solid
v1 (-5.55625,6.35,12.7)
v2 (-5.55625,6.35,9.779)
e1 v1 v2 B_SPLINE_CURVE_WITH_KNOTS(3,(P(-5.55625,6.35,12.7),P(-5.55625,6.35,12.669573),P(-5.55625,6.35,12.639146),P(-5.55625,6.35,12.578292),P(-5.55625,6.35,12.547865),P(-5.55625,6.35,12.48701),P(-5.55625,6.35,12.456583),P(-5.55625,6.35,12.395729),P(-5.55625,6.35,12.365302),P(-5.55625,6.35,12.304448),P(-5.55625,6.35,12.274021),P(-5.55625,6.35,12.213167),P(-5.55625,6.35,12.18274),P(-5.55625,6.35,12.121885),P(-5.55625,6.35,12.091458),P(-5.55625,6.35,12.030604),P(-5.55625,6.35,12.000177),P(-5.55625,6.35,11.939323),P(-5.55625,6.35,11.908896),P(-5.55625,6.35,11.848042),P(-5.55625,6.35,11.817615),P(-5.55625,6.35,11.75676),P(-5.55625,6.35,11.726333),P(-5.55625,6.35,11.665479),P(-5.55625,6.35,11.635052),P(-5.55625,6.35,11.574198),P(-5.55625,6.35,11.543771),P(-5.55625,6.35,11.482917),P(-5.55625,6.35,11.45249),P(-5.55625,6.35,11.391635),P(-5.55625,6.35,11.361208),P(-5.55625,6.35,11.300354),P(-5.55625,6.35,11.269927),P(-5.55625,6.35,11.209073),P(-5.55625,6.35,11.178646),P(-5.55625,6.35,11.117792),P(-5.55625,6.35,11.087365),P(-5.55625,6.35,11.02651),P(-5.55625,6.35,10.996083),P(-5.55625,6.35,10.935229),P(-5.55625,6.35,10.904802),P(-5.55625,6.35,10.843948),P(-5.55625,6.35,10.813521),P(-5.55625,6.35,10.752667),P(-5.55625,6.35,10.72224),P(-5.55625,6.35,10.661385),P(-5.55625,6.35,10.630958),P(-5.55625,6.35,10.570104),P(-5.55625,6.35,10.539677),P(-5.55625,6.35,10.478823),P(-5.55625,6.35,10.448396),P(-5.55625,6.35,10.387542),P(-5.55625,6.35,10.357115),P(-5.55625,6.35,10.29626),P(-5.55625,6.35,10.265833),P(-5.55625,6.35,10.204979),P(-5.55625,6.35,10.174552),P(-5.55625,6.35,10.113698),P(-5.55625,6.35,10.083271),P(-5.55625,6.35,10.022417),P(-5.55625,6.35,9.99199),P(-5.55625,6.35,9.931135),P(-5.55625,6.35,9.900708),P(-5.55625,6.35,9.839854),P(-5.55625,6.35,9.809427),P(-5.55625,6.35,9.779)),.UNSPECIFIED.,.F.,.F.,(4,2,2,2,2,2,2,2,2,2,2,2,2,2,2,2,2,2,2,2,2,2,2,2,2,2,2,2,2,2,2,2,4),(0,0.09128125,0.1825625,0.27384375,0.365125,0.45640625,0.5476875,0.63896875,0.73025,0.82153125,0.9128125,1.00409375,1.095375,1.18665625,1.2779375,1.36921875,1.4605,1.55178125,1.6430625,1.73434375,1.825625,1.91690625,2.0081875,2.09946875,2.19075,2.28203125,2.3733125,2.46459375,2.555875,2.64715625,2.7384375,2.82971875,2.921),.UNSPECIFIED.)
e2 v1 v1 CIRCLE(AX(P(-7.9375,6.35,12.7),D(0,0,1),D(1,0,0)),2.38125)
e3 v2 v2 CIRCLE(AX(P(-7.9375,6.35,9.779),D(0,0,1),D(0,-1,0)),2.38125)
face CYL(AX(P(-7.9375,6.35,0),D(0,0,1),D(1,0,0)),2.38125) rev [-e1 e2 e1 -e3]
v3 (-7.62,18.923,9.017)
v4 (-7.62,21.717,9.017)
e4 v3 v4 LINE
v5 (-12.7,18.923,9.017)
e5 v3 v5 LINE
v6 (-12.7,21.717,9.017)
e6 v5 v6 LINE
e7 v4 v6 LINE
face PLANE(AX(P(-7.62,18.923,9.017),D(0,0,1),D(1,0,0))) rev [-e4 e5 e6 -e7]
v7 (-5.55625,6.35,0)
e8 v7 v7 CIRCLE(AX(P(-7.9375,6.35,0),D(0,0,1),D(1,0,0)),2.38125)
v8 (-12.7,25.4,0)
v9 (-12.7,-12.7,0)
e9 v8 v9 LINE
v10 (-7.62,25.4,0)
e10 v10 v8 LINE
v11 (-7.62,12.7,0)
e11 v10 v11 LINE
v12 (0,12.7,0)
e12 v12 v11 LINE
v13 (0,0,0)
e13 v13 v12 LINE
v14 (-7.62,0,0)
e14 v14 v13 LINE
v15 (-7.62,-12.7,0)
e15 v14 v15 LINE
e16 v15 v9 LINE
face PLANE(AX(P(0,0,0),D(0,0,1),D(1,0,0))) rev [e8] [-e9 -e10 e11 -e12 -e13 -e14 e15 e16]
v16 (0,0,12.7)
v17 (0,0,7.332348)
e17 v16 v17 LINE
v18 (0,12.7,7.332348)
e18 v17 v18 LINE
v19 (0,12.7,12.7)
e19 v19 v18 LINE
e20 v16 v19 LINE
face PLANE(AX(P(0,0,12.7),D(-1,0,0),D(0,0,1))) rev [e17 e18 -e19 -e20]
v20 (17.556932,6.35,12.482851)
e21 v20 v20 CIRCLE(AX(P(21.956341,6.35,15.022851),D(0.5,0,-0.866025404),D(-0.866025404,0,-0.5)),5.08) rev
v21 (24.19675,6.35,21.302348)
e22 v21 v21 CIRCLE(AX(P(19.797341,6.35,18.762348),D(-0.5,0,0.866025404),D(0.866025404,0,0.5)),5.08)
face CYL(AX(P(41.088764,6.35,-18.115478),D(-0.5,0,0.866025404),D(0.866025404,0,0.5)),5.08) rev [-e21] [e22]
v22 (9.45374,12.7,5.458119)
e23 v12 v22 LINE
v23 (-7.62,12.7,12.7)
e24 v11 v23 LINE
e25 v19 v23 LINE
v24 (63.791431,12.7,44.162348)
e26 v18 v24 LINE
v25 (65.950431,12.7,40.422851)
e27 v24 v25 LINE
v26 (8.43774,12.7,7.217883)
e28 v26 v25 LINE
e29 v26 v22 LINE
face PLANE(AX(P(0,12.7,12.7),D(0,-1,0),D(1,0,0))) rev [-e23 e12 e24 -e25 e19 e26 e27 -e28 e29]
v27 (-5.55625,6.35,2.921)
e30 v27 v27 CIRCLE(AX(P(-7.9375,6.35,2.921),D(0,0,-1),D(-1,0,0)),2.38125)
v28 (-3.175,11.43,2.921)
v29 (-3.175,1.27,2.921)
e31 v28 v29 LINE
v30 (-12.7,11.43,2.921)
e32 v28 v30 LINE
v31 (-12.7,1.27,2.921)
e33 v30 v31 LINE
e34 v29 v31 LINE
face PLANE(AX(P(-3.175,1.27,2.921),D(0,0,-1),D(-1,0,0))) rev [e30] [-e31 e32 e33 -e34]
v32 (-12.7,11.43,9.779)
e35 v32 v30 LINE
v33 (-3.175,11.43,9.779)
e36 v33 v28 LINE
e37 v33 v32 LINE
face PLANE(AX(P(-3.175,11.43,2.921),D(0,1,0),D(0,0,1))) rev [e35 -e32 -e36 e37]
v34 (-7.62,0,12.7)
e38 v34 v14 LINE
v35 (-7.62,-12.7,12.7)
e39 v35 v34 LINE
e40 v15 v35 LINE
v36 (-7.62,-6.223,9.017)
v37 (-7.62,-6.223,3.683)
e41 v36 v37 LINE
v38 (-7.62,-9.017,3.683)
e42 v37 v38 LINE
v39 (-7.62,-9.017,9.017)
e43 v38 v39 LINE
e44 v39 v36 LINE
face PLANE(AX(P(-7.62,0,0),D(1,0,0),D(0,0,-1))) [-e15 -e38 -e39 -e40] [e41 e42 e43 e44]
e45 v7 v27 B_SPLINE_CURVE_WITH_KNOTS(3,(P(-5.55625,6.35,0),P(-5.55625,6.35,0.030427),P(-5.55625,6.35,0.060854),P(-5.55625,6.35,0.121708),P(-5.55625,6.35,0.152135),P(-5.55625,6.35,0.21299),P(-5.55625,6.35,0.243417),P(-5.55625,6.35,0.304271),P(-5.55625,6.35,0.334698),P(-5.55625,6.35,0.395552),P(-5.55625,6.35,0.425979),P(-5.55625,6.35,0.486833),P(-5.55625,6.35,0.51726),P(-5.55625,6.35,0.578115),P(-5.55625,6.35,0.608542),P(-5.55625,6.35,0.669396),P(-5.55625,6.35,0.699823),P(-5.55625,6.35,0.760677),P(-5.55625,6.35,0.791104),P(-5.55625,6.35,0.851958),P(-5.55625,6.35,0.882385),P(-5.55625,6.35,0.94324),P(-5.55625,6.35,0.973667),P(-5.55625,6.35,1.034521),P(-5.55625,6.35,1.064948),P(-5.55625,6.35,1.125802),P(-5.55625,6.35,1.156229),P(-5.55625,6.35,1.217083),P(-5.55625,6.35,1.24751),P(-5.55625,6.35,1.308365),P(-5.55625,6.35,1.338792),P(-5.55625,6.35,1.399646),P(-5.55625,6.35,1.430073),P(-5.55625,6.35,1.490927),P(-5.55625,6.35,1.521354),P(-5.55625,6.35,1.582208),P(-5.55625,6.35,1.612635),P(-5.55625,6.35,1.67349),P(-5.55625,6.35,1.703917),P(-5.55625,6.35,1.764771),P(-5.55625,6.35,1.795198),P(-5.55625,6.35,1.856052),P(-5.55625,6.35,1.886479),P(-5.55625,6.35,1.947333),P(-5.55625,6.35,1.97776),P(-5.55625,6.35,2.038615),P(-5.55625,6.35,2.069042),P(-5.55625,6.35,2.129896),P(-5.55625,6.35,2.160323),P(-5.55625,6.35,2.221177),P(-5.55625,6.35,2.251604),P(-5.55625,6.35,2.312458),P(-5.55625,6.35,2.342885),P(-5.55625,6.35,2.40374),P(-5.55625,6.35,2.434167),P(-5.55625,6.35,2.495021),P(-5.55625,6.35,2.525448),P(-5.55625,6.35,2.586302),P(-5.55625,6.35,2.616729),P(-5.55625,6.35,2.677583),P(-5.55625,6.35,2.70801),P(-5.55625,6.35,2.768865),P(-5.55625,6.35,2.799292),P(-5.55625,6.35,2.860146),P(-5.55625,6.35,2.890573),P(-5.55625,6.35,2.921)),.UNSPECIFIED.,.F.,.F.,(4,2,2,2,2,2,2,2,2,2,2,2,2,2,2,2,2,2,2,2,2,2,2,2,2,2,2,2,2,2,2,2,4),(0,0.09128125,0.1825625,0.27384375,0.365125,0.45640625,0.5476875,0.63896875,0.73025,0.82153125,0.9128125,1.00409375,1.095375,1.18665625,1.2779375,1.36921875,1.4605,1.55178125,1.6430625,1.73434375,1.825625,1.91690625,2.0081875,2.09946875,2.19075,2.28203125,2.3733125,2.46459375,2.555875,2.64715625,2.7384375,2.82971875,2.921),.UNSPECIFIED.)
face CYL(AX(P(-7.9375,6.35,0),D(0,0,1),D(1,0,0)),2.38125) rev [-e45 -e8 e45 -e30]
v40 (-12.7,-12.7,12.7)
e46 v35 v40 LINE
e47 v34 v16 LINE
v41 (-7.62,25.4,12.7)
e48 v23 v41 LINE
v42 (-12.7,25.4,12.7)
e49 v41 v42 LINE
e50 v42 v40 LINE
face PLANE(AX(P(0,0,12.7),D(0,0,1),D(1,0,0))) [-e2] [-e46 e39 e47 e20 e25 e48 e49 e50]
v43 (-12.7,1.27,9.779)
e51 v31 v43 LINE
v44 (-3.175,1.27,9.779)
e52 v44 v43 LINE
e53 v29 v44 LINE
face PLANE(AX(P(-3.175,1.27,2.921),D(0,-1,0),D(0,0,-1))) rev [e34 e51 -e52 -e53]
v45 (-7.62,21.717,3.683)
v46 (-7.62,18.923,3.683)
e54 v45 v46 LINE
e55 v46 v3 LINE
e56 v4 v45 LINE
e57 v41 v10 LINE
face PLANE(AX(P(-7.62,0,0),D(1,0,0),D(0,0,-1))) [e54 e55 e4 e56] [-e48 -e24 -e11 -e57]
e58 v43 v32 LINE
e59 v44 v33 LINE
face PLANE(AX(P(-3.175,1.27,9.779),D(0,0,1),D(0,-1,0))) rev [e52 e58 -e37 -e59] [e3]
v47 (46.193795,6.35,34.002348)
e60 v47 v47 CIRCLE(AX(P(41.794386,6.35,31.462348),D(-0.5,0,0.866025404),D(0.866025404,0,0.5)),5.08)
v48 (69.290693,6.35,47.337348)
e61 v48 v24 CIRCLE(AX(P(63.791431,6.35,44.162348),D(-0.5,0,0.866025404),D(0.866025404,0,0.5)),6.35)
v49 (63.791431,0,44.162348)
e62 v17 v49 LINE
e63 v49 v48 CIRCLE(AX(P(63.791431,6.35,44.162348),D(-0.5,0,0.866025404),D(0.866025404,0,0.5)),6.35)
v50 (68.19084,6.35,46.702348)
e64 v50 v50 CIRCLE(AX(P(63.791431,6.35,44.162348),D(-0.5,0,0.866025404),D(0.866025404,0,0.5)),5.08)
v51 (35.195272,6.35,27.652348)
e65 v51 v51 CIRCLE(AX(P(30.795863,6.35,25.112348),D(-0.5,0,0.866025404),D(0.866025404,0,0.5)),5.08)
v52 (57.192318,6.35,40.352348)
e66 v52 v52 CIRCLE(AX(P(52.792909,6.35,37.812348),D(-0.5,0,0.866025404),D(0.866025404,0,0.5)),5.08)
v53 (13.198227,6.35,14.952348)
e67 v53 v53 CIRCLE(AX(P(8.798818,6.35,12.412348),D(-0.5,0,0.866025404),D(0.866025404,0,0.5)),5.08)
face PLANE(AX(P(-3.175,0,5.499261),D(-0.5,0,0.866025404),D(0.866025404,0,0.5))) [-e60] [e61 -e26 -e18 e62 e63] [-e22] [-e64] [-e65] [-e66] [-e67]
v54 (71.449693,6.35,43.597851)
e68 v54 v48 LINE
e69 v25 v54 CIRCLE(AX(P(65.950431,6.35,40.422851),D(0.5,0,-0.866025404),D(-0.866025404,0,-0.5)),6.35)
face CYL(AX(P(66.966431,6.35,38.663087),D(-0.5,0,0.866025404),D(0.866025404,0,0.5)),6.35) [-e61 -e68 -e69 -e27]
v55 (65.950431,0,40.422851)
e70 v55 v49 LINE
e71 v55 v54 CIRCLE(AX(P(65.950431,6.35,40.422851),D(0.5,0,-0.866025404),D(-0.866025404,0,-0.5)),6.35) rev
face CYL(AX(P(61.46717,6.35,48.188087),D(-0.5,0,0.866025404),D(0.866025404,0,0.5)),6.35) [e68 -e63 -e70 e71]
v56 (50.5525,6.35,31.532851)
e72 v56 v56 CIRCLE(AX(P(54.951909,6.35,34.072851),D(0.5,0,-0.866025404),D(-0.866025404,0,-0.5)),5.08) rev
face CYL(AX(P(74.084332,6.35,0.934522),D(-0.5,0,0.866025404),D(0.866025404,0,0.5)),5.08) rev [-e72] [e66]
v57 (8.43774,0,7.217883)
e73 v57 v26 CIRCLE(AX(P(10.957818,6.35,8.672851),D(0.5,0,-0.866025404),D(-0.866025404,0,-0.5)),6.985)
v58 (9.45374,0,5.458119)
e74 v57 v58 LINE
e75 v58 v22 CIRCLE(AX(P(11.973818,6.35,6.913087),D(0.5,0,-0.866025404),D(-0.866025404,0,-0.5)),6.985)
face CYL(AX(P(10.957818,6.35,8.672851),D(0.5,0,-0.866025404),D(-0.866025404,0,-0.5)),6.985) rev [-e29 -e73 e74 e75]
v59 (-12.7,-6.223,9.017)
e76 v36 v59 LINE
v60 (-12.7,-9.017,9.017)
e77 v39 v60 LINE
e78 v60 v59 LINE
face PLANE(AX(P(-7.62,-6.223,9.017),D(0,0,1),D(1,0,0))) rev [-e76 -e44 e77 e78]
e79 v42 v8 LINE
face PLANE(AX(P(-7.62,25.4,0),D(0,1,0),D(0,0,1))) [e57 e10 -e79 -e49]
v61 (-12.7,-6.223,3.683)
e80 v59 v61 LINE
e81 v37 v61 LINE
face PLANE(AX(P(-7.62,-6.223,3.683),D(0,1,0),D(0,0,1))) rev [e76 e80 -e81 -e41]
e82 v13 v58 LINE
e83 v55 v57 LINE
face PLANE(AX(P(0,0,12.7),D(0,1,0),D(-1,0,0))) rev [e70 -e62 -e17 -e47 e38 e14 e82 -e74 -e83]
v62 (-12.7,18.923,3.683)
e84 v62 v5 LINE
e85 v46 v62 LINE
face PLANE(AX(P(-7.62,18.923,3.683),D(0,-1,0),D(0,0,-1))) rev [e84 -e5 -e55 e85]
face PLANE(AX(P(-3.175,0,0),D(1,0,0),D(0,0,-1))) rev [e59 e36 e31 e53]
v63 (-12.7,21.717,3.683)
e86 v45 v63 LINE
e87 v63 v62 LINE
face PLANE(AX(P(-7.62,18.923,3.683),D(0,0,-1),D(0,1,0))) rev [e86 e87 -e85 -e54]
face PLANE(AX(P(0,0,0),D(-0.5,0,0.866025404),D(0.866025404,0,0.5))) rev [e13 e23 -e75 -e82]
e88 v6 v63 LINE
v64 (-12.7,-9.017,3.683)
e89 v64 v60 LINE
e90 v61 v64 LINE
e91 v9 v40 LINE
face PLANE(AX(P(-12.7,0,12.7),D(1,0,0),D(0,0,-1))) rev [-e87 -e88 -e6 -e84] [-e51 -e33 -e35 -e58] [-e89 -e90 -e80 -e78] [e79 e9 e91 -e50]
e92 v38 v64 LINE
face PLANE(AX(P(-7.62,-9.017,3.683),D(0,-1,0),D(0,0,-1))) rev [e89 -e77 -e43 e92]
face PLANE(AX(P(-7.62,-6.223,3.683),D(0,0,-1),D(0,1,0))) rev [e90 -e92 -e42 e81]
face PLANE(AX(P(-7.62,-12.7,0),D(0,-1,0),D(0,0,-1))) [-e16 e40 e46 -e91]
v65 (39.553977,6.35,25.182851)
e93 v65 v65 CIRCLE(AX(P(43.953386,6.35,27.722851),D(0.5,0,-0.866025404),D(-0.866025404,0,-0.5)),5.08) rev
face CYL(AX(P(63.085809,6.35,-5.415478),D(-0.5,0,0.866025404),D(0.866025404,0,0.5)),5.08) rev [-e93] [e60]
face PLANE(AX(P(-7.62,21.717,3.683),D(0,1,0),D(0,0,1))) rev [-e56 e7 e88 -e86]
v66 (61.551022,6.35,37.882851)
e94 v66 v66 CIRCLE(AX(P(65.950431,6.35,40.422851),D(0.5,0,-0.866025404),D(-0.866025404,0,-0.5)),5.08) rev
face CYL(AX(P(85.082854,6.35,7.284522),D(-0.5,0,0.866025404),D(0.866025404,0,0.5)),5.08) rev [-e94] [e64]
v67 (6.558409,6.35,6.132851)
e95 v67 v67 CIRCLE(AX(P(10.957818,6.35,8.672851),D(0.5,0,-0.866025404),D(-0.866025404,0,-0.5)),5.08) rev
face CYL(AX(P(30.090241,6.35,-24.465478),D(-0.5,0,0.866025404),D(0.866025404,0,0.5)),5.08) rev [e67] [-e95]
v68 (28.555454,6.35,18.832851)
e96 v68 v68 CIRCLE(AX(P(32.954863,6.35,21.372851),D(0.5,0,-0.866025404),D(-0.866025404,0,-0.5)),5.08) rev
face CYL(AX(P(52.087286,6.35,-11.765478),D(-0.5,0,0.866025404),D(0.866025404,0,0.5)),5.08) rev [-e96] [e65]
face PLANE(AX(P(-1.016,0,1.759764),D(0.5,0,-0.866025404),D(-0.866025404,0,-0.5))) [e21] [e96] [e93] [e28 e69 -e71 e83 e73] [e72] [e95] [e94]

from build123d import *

# Parameters (mm, degrees)
SKETCH1_W           = 12.7
SKETCH1_H           = 12.7
BOSS_EXTRUDE1_DEPTH = 12.7
SKETCH2_W           = 12.7
SKETCH2_H           = 12.7
SKETCH2_W_2         = 5.334
SKETCH2_H_2         = 2.794
BOSS_EXTRUDE2_DEPTH = 5.08
SKETCH3_W           = 6.858
SKETCH3_H           = 10.16
CUT_EXTRUDE1_DEPTH  = 9.525
SKETCH4_R           = 2.38125
CUT_EXTRUDE2_DEPTH  = 32.108519733
BOSS_EXTRUDE3_DEPTH = 12.7
SKETCH8_R           = 5.08
CUT_EXTRUDE5_DEPTH  = 91.094949376
FILLET2_R           = 6.35
SKETCH9_R           = 6.985
SKETCH9_W           = 80.922597298
SKETCH9_H           = 13.97
CUT_EXTRUDE6_DEPTH  = 2.032


with BuildPart() as part:
    # Sketch1 → Boss-Extrude1 (new body)
    with BuildSketch(Plane.XY):
        with Locations((-6.35, 6.35)):
            Rectangle(SKETCH1_W, SKETCH1_H)
    extrude(amount=BOSS_EXTRUDE1_DEPTH)

    # Sketch2 → Boss-Extrude2 (add)
    # profile 1 of 2: a face of its own
    with BuildSketch(Plane.ZY.offset(12.7)):
        with Locations((6.35, 19.05)):
            Rectangle(SKETCH2_W, SKETCH2_H)
        with Locations((6.35, 20.32)):
            Rectangle(SKETCH2_W_2, SKETCH2_H_2, mode=Mode.SUBTRACT)
    # profile 2 of 2: a face of its own
    with BuildSketch(Plane.ZY.offset(12.7)):
        with Locations((6.35, -6.35)):
            Rectangle(SKETCH2_W, SKETCH2_H)
        with Locations((6.35, -7.62)):
            Rectangle(SKETCH2_W_2, SKETCH2_H_2, mode=Mode.SUBTRACT)
    extrude(amount=-BOSS_EXTRUDE2_DEPTH)

    # Sketch3 → Cut-Extrude1 (cut)
    with BuildSketch(Plane.ZY.offset(12.7)):
        with Locations((6.35, 6.35)):
            Rectangle(SKETCH3_W, SKETCH3_H)
    extrude(amount=-CUT_EXTRUDE1_DEPTH, mode=Mode.SUBTRACT)

    # Sketch4 → Cut-Extrude2 (cut, through all)
    with BuildSketch(Plane.XY.offset(12.7)):
        with Locations((-7.9375, 6.35)):
            Circle(SKETCH4_R)
    extrude(amount=-CUT_EXTRUDE2_DEPTH, mode=Mode.SUBTRACT)

    # Sketch7 → Boss-Extrude3 (add)
    with BuildSketch(Plane(origin=(0, 12.7, 0), x_dir=(1, 0, 0), z_dir=(0, 1, 0))):
        Polygon((72.465692557, -41.838087105), (69.290692557, -47.337348419), (0, -7.332348419), (3.175, -1.833087105), align=None)
        Polygon((0, 0), (0, -7.332348419), (3.175, -1.833087105), align=None)
    extrude(amount=-BOSS_EXTRUDE3_DEPTH)

    # Sketch8 → Cut-Extrude5 (cut, through all)
    with BuildSketch(Plane(origin=(-3.175, 0, 5.499261314), x_dir=(0.8660254037844417, 0, 0.49999999999999495), z_dir=(-0.49999999999999495, 0, 0.8660254037844417))):
        with Locations((13.826174209, 6.35)):
            Circle(SKETCH8_R)
        with Locations((26.526174209, 6.35)):
            Circle(SKETCH8_R)
        with Locations((39.226174209, 6.35)):
            Circle(SKETCH8_R)
        with Locations((51.926174209, 6.35)):
            Circle(SKETCH8_R)
        with Locations((64.626174209, 6.35)):
            Circle(SKETCH8_R)
        with Locations((77.326174209, 6.35)):
            Circle(SKETCH8_R)
    extrude(amount=-CUT_EXTRUDE5_DEPTH, mode=Mode.SUBTRACT)

    # Fillet2
    fillet2_edges = [part.edges().sort_by_distance(p)[0] for p in [
        (70.878192557, 0, 44.587717762),
        (70.878192557, 12.7, 44.587717762),
    ]]
    fillet(fillet2_edges, radius=FILLET2_R - 0.0001)  # a hair under: the kernel refuses the full size

    # Sketch9 → Cut-Extrude6 (cut)
    with BuildSketch(Plane(origin=(0, 0, 0), x_dir=(-0.8660254037844417, 0, -0.4999999999999947), z_dir=(0.4999999999999947, 0, -0.8660254037844417))):
        with Locations((-13.826174209, 6.35)):
            Circle(SKETCH9_R)
        with Locations((-54.287472858, 6.35)):
            Rectangle(SKETCH9_W, SKETCH9_H)
    extrude(amount=-CUT_EXTRUDE6_DEPTH, mode=Mode.SUBTRACT)


solid = part.part
